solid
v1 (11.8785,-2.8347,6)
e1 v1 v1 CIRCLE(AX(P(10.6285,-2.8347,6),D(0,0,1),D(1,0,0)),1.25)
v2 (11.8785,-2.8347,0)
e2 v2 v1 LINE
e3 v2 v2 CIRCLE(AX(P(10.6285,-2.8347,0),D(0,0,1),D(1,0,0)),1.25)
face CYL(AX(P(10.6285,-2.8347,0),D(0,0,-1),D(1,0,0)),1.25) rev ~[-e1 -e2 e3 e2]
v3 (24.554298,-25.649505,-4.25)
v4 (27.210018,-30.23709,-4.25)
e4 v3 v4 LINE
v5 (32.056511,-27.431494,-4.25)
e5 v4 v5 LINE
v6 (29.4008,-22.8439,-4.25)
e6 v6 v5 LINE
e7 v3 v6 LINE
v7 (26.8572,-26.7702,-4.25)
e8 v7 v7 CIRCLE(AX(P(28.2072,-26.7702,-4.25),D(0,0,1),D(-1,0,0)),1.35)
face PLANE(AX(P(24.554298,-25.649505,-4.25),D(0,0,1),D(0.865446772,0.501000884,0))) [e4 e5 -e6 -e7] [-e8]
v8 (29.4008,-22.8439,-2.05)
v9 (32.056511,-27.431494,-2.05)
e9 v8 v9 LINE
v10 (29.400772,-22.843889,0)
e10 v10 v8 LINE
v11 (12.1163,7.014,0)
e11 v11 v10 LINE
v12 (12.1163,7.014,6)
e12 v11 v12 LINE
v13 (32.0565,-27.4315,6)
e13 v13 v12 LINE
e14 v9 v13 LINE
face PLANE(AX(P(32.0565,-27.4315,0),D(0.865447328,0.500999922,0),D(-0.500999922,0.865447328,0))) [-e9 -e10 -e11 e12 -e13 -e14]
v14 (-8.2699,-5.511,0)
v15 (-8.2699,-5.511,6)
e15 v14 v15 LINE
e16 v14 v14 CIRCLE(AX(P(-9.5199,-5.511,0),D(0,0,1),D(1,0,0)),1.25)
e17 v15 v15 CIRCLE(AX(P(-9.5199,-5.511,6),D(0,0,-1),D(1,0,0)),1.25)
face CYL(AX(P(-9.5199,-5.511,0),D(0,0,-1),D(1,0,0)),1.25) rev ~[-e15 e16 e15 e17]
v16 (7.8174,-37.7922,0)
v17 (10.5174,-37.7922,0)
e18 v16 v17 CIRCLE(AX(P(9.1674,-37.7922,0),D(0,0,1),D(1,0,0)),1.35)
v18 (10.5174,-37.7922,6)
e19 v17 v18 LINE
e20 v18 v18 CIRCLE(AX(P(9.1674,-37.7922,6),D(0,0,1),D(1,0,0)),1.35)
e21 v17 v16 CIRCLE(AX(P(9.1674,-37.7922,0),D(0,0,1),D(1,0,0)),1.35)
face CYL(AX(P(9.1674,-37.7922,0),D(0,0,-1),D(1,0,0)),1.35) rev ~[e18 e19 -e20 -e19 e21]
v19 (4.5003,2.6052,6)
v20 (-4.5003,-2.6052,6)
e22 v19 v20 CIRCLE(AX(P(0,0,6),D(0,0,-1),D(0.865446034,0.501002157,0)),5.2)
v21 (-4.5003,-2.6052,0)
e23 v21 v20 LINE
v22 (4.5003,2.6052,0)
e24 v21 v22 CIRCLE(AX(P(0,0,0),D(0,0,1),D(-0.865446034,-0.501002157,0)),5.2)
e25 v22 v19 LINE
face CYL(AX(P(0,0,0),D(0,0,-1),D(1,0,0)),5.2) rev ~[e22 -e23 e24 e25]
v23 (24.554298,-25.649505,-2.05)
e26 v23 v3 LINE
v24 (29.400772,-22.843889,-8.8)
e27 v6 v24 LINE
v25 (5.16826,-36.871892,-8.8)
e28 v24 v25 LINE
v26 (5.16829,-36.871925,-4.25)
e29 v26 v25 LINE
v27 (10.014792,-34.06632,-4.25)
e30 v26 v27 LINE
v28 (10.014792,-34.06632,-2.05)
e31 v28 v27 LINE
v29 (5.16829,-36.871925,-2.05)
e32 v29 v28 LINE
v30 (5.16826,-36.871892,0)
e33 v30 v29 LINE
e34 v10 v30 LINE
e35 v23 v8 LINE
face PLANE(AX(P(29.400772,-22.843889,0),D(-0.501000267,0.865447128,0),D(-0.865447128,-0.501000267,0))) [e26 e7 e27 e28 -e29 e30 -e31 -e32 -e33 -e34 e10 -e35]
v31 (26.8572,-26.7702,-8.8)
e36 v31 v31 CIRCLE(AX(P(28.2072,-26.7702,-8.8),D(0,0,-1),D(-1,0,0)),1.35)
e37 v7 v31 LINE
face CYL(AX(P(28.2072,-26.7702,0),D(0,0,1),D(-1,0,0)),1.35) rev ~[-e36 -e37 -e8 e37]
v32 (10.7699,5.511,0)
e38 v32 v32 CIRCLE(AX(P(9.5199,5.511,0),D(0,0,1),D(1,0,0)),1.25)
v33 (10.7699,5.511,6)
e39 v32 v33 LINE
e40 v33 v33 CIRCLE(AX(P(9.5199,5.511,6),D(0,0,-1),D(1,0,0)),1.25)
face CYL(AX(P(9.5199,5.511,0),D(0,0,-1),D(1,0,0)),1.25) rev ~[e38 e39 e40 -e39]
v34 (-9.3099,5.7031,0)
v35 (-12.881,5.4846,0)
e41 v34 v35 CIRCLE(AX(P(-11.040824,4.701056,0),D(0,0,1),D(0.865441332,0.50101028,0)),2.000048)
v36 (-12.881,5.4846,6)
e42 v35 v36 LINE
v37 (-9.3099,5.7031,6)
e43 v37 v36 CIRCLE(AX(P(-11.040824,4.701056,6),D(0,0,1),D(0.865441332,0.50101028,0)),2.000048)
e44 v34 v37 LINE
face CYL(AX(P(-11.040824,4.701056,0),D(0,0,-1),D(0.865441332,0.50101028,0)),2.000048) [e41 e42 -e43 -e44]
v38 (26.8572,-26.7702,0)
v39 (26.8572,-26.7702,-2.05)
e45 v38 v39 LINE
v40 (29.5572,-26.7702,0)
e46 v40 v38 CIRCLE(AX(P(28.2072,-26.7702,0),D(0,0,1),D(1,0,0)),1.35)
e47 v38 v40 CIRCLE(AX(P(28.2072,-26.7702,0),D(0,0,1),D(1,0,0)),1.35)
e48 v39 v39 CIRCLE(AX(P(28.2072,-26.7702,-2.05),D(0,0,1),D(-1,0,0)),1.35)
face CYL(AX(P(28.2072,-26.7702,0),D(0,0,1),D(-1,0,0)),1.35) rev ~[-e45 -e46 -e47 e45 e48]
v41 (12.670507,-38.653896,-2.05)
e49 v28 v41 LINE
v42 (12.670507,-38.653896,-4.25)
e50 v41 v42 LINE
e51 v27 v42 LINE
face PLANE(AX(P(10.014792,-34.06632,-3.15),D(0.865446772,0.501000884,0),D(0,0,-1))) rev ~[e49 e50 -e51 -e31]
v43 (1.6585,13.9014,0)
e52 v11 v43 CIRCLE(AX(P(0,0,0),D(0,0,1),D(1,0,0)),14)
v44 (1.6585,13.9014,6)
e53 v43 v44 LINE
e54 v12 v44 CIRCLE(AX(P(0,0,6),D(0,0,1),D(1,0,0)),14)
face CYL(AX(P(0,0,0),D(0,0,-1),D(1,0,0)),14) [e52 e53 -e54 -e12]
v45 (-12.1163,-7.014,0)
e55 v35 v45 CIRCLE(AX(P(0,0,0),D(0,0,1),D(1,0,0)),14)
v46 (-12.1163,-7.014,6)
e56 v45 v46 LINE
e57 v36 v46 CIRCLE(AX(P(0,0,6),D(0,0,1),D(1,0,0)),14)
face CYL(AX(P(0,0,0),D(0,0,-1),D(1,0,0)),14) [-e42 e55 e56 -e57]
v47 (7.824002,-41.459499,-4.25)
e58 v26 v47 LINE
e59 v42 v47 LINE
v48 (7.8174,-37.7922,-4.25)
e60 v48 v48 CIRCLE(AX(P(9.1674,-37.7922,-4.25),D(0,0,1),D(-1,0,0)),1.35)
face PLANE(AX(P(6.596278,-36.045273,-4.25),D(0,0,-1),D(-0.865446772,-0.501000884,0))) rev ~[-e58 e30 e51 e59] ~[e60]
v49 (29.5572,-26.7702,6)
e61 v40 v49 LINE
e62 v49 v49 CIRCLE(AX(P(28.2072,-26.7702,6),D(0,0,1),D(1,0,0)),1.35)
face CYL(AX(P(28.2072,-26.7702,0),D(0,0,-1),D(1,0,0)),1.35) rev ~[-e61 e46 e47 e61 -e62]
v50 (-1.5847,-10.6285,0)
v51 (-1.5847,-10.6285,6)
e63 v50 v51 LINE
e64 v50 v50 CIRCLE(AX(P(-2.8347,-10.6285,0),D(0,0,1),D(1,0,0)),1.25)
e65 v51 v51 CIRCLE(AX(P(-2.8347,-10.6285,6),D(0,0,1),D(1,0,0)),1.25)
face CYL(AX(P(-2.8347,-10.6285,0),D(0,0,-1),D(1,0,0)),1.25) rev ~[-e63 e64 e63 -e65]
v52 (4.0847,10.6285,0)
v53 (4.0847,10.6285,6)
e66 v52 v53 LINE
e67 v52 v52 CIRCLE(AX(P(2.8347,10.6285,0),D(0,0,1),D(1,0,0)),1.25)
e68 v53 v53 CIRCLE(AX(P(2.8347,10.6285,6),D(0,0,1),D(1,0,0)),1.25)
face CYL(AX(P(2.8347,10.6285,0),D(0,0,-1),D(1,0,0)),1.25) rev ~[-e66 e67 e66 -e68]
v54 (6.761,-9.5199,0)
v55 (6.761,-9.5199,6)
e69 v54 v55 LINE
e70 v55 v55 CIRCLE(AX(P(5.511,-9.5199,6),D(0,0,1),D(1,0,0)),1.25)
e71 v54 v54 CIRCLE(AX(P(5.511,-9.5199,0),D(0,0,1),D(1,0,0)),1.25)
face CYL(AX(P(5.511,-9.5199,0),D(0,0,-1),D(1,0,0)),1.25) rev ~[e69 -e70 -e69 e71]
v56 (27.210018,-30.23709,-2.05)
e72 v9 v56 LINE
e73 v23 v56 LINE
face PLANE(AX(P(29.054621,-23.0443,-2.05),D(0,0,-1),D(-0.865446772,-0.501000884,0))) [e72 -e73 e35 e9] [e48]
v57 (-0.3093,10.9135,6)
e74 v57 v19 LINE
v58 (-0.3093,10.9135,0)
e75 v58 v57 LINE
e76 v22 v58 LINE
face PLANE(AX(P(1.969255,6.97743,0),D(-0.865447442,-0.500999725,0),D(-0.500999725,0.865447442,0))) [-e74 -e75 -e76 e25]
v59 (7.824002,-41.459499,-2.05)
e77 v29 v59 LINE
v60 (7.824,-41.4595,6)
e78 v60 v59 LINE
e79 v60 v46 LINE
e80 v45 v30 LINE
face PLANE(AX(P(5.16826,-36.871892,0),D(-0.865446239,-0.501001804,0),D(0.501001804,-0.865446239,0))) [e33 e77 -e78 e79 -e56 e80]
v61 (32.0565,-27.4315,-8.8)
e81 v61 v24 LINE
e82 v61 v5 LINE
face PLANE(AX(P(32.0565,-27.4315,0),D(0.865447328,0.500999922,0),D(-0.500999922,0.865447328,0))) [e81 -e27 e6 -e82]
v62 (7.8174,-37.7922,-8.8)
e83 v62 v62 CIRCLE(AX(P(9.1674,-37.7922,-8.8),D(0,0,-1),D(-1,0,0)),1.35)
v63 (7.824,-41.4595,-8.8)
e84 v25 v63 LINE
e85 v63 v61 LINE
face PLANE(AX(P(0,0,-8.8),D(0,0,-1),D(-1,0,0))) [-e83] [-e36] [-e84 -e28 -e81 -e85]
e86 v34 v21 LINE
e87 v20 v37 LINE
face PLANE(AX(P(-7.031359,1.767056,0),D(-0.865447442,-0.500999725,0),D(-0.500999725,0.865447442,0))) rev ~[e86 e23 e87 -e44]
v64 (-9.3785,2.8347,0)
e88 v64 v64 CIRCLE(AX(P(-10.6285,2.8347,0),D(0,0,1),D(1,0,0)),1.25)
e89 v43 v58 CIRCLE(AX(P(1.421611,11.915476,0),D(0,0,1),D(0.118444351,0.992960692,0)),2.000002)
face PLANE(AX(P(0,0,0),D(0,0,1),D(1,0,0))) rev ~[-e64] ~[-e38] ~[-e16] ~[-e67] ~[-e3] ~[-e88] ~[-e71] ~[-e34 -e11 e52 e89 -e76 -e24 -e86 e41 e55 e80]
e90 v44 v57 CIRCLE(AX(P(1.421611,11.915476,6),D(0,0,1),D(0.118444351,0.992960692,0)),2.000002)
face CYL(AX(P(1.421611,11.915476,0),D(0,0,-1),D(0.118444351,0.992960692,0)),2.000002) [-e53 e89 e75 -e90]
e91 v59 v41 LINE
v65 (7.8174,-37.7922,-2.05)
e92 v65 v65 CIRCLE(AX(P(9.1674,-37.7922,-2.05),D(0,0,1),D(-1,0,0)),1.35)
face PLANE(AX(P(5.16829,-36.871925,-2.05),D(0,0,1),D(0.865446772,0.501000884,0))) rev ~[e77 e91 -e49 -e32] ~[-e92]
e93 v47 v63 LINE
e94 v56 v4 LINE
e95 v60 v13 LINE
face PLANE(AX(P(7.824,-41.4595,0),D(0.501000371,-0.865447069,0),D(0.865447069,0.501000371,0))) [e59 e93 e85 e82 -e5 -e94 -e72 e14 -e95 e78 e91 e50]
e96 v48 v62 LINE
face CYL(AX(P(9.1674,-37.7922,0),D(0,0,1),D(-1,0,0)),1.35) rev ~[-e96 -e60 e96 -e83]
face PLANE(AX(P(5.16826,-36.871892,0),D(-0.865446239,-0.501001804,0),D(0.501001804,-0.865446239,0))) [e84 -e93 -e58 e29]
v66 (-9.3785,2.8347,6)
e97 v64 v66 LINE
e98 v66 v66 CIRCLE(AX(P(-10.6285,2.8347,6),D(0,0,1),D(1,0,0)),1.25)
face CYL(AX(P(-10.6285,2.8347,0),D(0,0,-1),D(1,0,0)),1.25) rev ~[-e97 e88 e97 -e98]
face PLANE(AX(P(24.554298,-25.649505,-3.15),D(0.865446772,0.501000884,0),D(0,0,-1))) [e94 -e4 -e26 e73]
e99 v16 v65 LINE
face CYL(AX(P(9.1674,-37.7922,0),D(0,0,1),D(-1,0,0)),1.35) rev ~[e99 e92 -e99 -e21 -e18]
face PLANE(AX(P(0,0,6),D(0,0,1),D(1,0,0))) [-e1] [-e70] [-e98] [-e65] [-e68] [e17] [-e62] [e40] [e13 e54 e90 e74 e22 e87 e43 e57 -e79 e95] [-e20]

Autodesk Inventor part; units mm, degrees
ref_plane "YZ Plane" through (0, 0, 0) normal (1, 0, 0) x (0, 1, 0)
ref_plane "XZ Plane" through (0, 0, 0) normal (0, 1, 0) x (-1, 0, 0)
ref_plane "XY Plane" through (0, 0, 0) normal (0, 0, 1) x (1, 0, 0)
sketch "스케치2" plane through (0, 0, 0) normal (0, 0, 1) x (1, 0, 0)
  circle A0 centre (0, 0) radius 14 projected
  arc A1 (-12.8234, 5.618) -> (-12.1163, -7.014) centre (0, 0) ccw projected
  line L0 (-12.1163, -7.014) -> (7.824, -41.4595) projected
  line L1 (7.824, -41.4595) -> (32.0565, -27.4315) projected
  line L2 (32.0565, -27.4315) -> (12.1163, 7.014) projected
  arc A2 (12.1163, 7.014) -> (1.5142, 13.9179) centre (0, 0) ccw projected
  circle A3 centre (9.5199, 5.511) radius 1.25 projected
  circle A4 centre (-9.5199, -5.511) radius 1.25 projected
  circle A5 centre (-10.6285, 2.8347) radius 1.25 projected
  circle A6 centre (28.2072, -26.7702) radius 1.35 projected
  circle A7 centre (9.1674, -37.7922) radius 1.35 projected
  circle A8 centre (2.8347, 10.6285) radius 1.25 projected
  circle A9 centre (-2.8347, -10.6285) radius 1.25 projected
  circle A10 centre (5.511, -9.5199) radius 1.25 projected
  circle A11 centre (10.6285, -2.8347) radius 1.25 projected
  circle A12 centre (0, 0) radius 7.25
  line L3 (-9.5199, -5.511) -> (9.5199, 5.511)
  line L4 (9.5199, 5.511) -> (-6.2745, -3.6323)
  arc A13 (-11.0126, 8.6443) -> (1.6585, 13.9014) centre (0, 0) ccw
  line L5 (3.9327, -21.2645) -> (16.4817, -14)
  circle A14 centre (9.5199, 5.511) radius 1.25
  circle A15 centre (-9.5199, -5.511) radius 1.25
  circle A16 centre (-10.6285, 2.8347) radius 1.25
  circle A17 centre (-5.511, 9.5199) radius 1.25
  circle A18 centre (2.8347, 10.6285) radius 1.25
  circle A19 centre (0, 0) radius 7.25
  line L6 (-16.4817, 14) -> (-3.9327, 21.2645)
  circle A20 centre (0, 0) radius 5.2
  line L7 (-4.5003, -2.6052) -> (-9.3099, 5.7031)
  line L8 (4.5003, 2.6052) -> (-0.3093, 10.9135)
  arc A21 (13.8078, -2.3119) -> (-2.0119, 13.8547) centre (0, 0) ccw
  arc A22 (-12.881, 5.4846) -> (-4.8714, -13.1251) centre (0, 0) ccw
  arc A23 (-9.3099, 5.7031) -> (-12.881, 5.4846) centre (-11.0408, 4.7011) ccw
  arc A24 (1.6585, 13.9014) -> (-0.3093, 10.9135) centre (1.4216, 11.9155) ccw
  line L9 (17.8441, -36.8125) -> (14.8381, -31.6198) projected
  line L10 (5.3181, -37.1308) -> (14.8381, -31.6198) projected
  line L11 (8.3241, -42.3235) -> (5.3181, -37.1308) projected
  line L12 (17.8441, -36.8125) -> (8.3241, -42.3235) projected
  circle A25 centre (9.1674, -37.7922) radius 1.35 projected
  line L13 (20.0307, -28.6138) -> (23.0367, -33.8065) projected
  line L14 (32.5567, -28.2955) -> (23.0367, -33.8065) projected
  line L15 (29.5507, -23.1028) -> (32.5567, -28.2955) projected
  line L16 (20.0307, -28.6138) -> (29.5507, -23.1028) projected
  circle A26 centre (28.2072, -26.7702) radius 1.35 projected
  line L17 (8.3606, -42.1868) -> (5.4548, -37.1673)
  line L18 (5.4548, -37.1673) -> (14.8016, -31.7564)
  line L19 (14.8016, -31.7564) -> (17.7074, -36.776)
  line L20 (17.7074, -36.776) -> (8.3606, -42.1868)
  line L21 (8.3606, -42.1868) -> (8.274, -42.2369)
  line L22 (8.274, -42.2369) -> (32.5066, -28.2089)
  point P0 (0, 0)
  point P1 (6.2745, 3.6323)
  point P2 (-0.2742, -13.9973)
  point P3 (12.2747, -6.7328)
  point P4 (0, 0)
  point P5 (0, 0)
  point P6 (-12.2747, 6.7328)
  point P7 (0.2742, 13.9973)
  point P8 (-12.881, 5.4846)
  point P9 (1.6585, 13.9014)
  dimension "d16" = 2
  dimension "d17" = 0.1
extrude "돌출1" add sketch "스케치2" along normal blind 6 contours A0 A23 L7 A12 L8 A24 | A0 L2 L16 L13 L1 L9 L10 L0 | L2 L1 L13 L16 | A12 L3 L8 | L10 L9 L1 L19 L18 L17 L0 | A12 L3 A20 | L7 L3 A12 | L1 L17 L18 L19 picked at (1.2989, -11.4658)
sketch "스케치8" plane through (0, 0, 0) normal (0, 0, -1) x (-1, 0, 0)
  circle A0 centre (9.5199, -5.511) radius 1.25 projected
  circle A1 centre (2.8347, -10.6285) radius 1.25 projected
  circle A2 centre (-5.511, -9.5199) radius 1.25 projected
  circle A3 centre (-10.6285, -2.8347) radius 1.25 projected
  circle A4 centre (-9.5199, 5.511) radius 1.25 projected
  circle A5 centre (-28.2072, -26.7702) radius 1.35 projected
  circle A6 centre (-9.1674, -37.7922) radius 1.35 projected
  line L0 (-7.824, -41.4595) -> (-32.0565, -27.4315) projected
  line L1 (12.1163, -7.014) -> (-7.824, -41.4595) projected
  arc A7 (12.1163, -7.014) -> (12.881, 5.4846) centre (0, 0) ccw projected
  arc A8 (12.881, 5.4846) -> (9.3099, 5.7031) centre (11.0408, 4.7011) ccw projected
  line L2 (4.5003, -2.6052) -> (9.3099, 5.7031) projected
  arc A9 (-4.5003, 2.6052) -> (4.5003, -2.6052) centre (0, 0) ccw projected
  line L3 (0.3093, 10.9135) -> (-4.5003, 2.6052) projected
  arc A10 (0.3093, 10.9135) -> (-1.6585, 13.9014) centre (-1.4216, 11.9155) ccw projected
  arc A11 (-1.6585, 13.9014) -> (-12.1163, 7.014) centre (0, 0) ccw projected
  line L4 (-32.0565, -27.4315) -> (-12.1163, 7.014) projected
  line L5 (-32.0565, -27.4315) -> (-7.824, -41.4595)
  line L6 (-34.4039, -32.4845) -> (-32.673, -33.4865) projected
  arc A12 (-32.673, -33.4865) -> (-29.5985, -32.6665) centre (-31.5458, -31.5392) ccw projected
  line L7 (-29.5985, -32.6665) -> (-28.5965, -30.9356) projected
  arc A13 (-27.2301, -30.5712) -> (-28.5965, -30.9356) centre (-27.7311, -31.4366) ccw projected
  line L8 (-27.2301, -30.5712) -> (-12.9502, -38.8377) projected
  arc A14 (-12.5858, -40.2041) -> (-12.9502, -38.8377) centre (-13.4512, -39.7031) ccw projected
  line L9 (-12.5858, -40.2041) -> (-13.5878, -41.935) projected
  arc A15 (-13.5878, -41.935) -> (-12.7678, -45.0095) centre (-11.6405, -43.0623) ccw projected
  line L10 (-12.7678, -45.0095) -> (-11.0369, -46.0115) projected
  arc A16 (-10.6724, -47.378) -> (-11.0369, -46.0115) centre (-11.5379, -46.877) ccw projected
  line L11 (-10.6724, -47.378) -> (-34.2195, -88.054) projected
  arc A17 (-35.5859, -88.4184) -> (-34.2195, -88.054) centre (-35.0849, -87.553) ccw projected
  line L12 (-35.5859, -88.4184) -> (-37.3168, -87.4164) projected
  arc A18 (-37.3168, -87.4164) -> (-40.3913, -88.2364) centre (-38.444, -89.3637) ccw projected
  line L13 (-40.3913, -88.2364) -> (-41.8943, -90.8328) projected
  line L14 (-36.918, -93.7135) -> (-41.8943, -90.8328) projected
  line L15 (-29.4982, -91.0759) -> (-36.918, -93.7135) projected
  line L16 (-2.8951, -45.1207) -> (-29.4982, -91.0759) projected
  line L17 (-4.3028, -37.3729) -> (-2.8951, -45.1207) projected
  line L18 (-30.2662, -22.3429) -> (-4.3028, -37.3729) projected
  line L19 (-37.686, -24.9805) -> (-30.2662, -22.3429) projected
  line L20 (-64.2892, -70.9357) -> (-37.686, -24.9805) projected
  line L21 (-62.8814, -78.6835) -> (-64.2892, -70.9357) projected
  line L22 (-57.9051, -81.5642) -> (-62.8814, -78.6835) projected
  line L23 (-57.9051, -81.5642) -> (-56.4021, -78.9679) projected
  arc A19 (-56.4021, -78.9679) -> (-57.2221, -75.8934) centre (-58.3493, -77.8406) ccw projected
  line L24 (-57.2221, -75.8934) -> (-58.953, -74.8914) projected
  arc A20 (-59.3174, -73.5249) -> (-58.953, -74.8914) centre (-58.452, -74.0259) ccw projected
  line L25 (-59.3174, -73.5249) -> (-35.7704, -32.8489) projected
  arc A21 (-34.4039, -32.4845) -> (-35.7704, -32.8489) centre (-34.9049, -33.3499) ccw projected
  circle A22 centre (-59.6114, -68.444) radius 1.35 projected
  circle A23 centre (-48.5894, -49.4042) radius 1.35 projected
  circle A24 centre (-28.2072, -26.7702) radius 1.35 projected
  circle A25 centre (-29.667, -85.7786) radius 1.35 projected
  circle A26 centre (-18.6449, -66.7388) radius 1.35 projected
  circle A27 centre (-9.1674, -37.7922) radius 1.35 projected
  circle A28 centre (-37.5674, -30.3643) radius 1.35 projected
  circle A29 centre (-7.6229, -47.699) radius 1.35 projected
  point P0 (0, 0)
  point P1 (-29.4008, -22.8439)
  point P2 (-17.2574, -35.9986)
  point P3 (-5.1683, -36.8719)
extrude "돌출4" add sketch "스케치8" along normal blind 8.8 contours L0 L4 L18 L1
sketch "스케치9" plane through (29.4008, -22.8439, 0) normal (-0.5010009, 0.8654468, 0) x (0.8654468, 0.5010009, 0)
  line L0 (-26.35, 8.8) -> (-23.65, 8.8) projected
  line L1 (-23.65, -6) -> (-26.35, -6) projected
  line L2 (-25, 8.8) -> (-25, -6)
  line L3 (-25, -2.5) -> (-25, 8.8)
  line L4 (-25, 8.8) -> (-25, -2.5)
  line L5 (-25, 3.15) -> (-27.6, 3.15)
  line L6 (-25, 3.15) -> (-22.4, 3.15)
  line L7 (-22.4, 3.15) -> (-22.4, 2.05)
  line L8 (-22.4, 3.15) -> (-22.4, 4.25)
  line L9 (-22.4, 4.25) -> (-27.6, 4.25)
  line L10 (-27.6, 4.25) -> (-27.6, 2.05)
  line L11 (-27.6, 2.05) -> (-22.4, 2.05)
  line L12 (-22.4, 2.05) -> (-22.4, 4.25)
  line L13 (-28, 0) -> (-28, 8.8) projected
  line L14 (-27.6, 4.25) -> (-28, 4.25)
  line L15 (-28, 4.25) -> (-28, 2.05)
  line L16 (-28, 2.05) -> (-27.6, 2.05)
  line L17 (-27.6, 2.05) -> (-27.6, 4.25)
  line L18 (0, 0) -> (-28, 0)
  line L19 (-26.35, -6) -> (-26.35, 8.8) projected
  line L20 (-14, 0) -> (-14, 8.8)
  line L21 (-28, 8.8) -> (0, 8.8) projected
  line L22 (-3, 3.15) -> (-0.4, 3.15)
  line L23 (-3, 3.15) -> (-5.6, 3.15)
  line L24 (-5.6, 3.15) -> (-5.6, 2.05)
  line L25 (-5.6, 3.15) -> (-5.6, 4.25)
  line L26 (-5.6, 4.25) -> (-0.4, 4.25)
  line L27 (-0.4, 4.25) -> (-0.4, 2.05)
  line L28 (-0.4, 2.05) -> (-5.6, 2.05)
  line L29 (-5.6, 2.05) -> (-5.6, 4.25)
  line L30 (-0.4, 4.25) -> (0, 4.25)
  line L31 (0, 4.25) -> (0, 2.05)
  line L32 (0, 2.05) -> (-0.4, 2.05)
  line L33 (-0.4, 2.05) -> (-0.4, 4.25)
  point P0 (-5.6, 2.05)
  point P1 (-0.4, 2.05)
  dimension "d20" = 2.6
  dimension "d21" = 2.6
  dimension "d22" = 1.1
  dimension "d23" = 1.1
extrude "돌출5" cut sketch "스케치9" against normal up to next contours L19 L5 L10 L9 | L9 L2 L5 L19 | L9 L8 L6 L2 | L10 L16 L13 L14 | L19 L11 L10 L5 | L5 L2 L11 L19 | L6 L7 L11 L2 | L23 L25 L26 L27 L22 | L22 L27 L28 L24 L23 | L27 L30 L31 L32
properties part number "부품47" material "PMMA 플라스틱"
